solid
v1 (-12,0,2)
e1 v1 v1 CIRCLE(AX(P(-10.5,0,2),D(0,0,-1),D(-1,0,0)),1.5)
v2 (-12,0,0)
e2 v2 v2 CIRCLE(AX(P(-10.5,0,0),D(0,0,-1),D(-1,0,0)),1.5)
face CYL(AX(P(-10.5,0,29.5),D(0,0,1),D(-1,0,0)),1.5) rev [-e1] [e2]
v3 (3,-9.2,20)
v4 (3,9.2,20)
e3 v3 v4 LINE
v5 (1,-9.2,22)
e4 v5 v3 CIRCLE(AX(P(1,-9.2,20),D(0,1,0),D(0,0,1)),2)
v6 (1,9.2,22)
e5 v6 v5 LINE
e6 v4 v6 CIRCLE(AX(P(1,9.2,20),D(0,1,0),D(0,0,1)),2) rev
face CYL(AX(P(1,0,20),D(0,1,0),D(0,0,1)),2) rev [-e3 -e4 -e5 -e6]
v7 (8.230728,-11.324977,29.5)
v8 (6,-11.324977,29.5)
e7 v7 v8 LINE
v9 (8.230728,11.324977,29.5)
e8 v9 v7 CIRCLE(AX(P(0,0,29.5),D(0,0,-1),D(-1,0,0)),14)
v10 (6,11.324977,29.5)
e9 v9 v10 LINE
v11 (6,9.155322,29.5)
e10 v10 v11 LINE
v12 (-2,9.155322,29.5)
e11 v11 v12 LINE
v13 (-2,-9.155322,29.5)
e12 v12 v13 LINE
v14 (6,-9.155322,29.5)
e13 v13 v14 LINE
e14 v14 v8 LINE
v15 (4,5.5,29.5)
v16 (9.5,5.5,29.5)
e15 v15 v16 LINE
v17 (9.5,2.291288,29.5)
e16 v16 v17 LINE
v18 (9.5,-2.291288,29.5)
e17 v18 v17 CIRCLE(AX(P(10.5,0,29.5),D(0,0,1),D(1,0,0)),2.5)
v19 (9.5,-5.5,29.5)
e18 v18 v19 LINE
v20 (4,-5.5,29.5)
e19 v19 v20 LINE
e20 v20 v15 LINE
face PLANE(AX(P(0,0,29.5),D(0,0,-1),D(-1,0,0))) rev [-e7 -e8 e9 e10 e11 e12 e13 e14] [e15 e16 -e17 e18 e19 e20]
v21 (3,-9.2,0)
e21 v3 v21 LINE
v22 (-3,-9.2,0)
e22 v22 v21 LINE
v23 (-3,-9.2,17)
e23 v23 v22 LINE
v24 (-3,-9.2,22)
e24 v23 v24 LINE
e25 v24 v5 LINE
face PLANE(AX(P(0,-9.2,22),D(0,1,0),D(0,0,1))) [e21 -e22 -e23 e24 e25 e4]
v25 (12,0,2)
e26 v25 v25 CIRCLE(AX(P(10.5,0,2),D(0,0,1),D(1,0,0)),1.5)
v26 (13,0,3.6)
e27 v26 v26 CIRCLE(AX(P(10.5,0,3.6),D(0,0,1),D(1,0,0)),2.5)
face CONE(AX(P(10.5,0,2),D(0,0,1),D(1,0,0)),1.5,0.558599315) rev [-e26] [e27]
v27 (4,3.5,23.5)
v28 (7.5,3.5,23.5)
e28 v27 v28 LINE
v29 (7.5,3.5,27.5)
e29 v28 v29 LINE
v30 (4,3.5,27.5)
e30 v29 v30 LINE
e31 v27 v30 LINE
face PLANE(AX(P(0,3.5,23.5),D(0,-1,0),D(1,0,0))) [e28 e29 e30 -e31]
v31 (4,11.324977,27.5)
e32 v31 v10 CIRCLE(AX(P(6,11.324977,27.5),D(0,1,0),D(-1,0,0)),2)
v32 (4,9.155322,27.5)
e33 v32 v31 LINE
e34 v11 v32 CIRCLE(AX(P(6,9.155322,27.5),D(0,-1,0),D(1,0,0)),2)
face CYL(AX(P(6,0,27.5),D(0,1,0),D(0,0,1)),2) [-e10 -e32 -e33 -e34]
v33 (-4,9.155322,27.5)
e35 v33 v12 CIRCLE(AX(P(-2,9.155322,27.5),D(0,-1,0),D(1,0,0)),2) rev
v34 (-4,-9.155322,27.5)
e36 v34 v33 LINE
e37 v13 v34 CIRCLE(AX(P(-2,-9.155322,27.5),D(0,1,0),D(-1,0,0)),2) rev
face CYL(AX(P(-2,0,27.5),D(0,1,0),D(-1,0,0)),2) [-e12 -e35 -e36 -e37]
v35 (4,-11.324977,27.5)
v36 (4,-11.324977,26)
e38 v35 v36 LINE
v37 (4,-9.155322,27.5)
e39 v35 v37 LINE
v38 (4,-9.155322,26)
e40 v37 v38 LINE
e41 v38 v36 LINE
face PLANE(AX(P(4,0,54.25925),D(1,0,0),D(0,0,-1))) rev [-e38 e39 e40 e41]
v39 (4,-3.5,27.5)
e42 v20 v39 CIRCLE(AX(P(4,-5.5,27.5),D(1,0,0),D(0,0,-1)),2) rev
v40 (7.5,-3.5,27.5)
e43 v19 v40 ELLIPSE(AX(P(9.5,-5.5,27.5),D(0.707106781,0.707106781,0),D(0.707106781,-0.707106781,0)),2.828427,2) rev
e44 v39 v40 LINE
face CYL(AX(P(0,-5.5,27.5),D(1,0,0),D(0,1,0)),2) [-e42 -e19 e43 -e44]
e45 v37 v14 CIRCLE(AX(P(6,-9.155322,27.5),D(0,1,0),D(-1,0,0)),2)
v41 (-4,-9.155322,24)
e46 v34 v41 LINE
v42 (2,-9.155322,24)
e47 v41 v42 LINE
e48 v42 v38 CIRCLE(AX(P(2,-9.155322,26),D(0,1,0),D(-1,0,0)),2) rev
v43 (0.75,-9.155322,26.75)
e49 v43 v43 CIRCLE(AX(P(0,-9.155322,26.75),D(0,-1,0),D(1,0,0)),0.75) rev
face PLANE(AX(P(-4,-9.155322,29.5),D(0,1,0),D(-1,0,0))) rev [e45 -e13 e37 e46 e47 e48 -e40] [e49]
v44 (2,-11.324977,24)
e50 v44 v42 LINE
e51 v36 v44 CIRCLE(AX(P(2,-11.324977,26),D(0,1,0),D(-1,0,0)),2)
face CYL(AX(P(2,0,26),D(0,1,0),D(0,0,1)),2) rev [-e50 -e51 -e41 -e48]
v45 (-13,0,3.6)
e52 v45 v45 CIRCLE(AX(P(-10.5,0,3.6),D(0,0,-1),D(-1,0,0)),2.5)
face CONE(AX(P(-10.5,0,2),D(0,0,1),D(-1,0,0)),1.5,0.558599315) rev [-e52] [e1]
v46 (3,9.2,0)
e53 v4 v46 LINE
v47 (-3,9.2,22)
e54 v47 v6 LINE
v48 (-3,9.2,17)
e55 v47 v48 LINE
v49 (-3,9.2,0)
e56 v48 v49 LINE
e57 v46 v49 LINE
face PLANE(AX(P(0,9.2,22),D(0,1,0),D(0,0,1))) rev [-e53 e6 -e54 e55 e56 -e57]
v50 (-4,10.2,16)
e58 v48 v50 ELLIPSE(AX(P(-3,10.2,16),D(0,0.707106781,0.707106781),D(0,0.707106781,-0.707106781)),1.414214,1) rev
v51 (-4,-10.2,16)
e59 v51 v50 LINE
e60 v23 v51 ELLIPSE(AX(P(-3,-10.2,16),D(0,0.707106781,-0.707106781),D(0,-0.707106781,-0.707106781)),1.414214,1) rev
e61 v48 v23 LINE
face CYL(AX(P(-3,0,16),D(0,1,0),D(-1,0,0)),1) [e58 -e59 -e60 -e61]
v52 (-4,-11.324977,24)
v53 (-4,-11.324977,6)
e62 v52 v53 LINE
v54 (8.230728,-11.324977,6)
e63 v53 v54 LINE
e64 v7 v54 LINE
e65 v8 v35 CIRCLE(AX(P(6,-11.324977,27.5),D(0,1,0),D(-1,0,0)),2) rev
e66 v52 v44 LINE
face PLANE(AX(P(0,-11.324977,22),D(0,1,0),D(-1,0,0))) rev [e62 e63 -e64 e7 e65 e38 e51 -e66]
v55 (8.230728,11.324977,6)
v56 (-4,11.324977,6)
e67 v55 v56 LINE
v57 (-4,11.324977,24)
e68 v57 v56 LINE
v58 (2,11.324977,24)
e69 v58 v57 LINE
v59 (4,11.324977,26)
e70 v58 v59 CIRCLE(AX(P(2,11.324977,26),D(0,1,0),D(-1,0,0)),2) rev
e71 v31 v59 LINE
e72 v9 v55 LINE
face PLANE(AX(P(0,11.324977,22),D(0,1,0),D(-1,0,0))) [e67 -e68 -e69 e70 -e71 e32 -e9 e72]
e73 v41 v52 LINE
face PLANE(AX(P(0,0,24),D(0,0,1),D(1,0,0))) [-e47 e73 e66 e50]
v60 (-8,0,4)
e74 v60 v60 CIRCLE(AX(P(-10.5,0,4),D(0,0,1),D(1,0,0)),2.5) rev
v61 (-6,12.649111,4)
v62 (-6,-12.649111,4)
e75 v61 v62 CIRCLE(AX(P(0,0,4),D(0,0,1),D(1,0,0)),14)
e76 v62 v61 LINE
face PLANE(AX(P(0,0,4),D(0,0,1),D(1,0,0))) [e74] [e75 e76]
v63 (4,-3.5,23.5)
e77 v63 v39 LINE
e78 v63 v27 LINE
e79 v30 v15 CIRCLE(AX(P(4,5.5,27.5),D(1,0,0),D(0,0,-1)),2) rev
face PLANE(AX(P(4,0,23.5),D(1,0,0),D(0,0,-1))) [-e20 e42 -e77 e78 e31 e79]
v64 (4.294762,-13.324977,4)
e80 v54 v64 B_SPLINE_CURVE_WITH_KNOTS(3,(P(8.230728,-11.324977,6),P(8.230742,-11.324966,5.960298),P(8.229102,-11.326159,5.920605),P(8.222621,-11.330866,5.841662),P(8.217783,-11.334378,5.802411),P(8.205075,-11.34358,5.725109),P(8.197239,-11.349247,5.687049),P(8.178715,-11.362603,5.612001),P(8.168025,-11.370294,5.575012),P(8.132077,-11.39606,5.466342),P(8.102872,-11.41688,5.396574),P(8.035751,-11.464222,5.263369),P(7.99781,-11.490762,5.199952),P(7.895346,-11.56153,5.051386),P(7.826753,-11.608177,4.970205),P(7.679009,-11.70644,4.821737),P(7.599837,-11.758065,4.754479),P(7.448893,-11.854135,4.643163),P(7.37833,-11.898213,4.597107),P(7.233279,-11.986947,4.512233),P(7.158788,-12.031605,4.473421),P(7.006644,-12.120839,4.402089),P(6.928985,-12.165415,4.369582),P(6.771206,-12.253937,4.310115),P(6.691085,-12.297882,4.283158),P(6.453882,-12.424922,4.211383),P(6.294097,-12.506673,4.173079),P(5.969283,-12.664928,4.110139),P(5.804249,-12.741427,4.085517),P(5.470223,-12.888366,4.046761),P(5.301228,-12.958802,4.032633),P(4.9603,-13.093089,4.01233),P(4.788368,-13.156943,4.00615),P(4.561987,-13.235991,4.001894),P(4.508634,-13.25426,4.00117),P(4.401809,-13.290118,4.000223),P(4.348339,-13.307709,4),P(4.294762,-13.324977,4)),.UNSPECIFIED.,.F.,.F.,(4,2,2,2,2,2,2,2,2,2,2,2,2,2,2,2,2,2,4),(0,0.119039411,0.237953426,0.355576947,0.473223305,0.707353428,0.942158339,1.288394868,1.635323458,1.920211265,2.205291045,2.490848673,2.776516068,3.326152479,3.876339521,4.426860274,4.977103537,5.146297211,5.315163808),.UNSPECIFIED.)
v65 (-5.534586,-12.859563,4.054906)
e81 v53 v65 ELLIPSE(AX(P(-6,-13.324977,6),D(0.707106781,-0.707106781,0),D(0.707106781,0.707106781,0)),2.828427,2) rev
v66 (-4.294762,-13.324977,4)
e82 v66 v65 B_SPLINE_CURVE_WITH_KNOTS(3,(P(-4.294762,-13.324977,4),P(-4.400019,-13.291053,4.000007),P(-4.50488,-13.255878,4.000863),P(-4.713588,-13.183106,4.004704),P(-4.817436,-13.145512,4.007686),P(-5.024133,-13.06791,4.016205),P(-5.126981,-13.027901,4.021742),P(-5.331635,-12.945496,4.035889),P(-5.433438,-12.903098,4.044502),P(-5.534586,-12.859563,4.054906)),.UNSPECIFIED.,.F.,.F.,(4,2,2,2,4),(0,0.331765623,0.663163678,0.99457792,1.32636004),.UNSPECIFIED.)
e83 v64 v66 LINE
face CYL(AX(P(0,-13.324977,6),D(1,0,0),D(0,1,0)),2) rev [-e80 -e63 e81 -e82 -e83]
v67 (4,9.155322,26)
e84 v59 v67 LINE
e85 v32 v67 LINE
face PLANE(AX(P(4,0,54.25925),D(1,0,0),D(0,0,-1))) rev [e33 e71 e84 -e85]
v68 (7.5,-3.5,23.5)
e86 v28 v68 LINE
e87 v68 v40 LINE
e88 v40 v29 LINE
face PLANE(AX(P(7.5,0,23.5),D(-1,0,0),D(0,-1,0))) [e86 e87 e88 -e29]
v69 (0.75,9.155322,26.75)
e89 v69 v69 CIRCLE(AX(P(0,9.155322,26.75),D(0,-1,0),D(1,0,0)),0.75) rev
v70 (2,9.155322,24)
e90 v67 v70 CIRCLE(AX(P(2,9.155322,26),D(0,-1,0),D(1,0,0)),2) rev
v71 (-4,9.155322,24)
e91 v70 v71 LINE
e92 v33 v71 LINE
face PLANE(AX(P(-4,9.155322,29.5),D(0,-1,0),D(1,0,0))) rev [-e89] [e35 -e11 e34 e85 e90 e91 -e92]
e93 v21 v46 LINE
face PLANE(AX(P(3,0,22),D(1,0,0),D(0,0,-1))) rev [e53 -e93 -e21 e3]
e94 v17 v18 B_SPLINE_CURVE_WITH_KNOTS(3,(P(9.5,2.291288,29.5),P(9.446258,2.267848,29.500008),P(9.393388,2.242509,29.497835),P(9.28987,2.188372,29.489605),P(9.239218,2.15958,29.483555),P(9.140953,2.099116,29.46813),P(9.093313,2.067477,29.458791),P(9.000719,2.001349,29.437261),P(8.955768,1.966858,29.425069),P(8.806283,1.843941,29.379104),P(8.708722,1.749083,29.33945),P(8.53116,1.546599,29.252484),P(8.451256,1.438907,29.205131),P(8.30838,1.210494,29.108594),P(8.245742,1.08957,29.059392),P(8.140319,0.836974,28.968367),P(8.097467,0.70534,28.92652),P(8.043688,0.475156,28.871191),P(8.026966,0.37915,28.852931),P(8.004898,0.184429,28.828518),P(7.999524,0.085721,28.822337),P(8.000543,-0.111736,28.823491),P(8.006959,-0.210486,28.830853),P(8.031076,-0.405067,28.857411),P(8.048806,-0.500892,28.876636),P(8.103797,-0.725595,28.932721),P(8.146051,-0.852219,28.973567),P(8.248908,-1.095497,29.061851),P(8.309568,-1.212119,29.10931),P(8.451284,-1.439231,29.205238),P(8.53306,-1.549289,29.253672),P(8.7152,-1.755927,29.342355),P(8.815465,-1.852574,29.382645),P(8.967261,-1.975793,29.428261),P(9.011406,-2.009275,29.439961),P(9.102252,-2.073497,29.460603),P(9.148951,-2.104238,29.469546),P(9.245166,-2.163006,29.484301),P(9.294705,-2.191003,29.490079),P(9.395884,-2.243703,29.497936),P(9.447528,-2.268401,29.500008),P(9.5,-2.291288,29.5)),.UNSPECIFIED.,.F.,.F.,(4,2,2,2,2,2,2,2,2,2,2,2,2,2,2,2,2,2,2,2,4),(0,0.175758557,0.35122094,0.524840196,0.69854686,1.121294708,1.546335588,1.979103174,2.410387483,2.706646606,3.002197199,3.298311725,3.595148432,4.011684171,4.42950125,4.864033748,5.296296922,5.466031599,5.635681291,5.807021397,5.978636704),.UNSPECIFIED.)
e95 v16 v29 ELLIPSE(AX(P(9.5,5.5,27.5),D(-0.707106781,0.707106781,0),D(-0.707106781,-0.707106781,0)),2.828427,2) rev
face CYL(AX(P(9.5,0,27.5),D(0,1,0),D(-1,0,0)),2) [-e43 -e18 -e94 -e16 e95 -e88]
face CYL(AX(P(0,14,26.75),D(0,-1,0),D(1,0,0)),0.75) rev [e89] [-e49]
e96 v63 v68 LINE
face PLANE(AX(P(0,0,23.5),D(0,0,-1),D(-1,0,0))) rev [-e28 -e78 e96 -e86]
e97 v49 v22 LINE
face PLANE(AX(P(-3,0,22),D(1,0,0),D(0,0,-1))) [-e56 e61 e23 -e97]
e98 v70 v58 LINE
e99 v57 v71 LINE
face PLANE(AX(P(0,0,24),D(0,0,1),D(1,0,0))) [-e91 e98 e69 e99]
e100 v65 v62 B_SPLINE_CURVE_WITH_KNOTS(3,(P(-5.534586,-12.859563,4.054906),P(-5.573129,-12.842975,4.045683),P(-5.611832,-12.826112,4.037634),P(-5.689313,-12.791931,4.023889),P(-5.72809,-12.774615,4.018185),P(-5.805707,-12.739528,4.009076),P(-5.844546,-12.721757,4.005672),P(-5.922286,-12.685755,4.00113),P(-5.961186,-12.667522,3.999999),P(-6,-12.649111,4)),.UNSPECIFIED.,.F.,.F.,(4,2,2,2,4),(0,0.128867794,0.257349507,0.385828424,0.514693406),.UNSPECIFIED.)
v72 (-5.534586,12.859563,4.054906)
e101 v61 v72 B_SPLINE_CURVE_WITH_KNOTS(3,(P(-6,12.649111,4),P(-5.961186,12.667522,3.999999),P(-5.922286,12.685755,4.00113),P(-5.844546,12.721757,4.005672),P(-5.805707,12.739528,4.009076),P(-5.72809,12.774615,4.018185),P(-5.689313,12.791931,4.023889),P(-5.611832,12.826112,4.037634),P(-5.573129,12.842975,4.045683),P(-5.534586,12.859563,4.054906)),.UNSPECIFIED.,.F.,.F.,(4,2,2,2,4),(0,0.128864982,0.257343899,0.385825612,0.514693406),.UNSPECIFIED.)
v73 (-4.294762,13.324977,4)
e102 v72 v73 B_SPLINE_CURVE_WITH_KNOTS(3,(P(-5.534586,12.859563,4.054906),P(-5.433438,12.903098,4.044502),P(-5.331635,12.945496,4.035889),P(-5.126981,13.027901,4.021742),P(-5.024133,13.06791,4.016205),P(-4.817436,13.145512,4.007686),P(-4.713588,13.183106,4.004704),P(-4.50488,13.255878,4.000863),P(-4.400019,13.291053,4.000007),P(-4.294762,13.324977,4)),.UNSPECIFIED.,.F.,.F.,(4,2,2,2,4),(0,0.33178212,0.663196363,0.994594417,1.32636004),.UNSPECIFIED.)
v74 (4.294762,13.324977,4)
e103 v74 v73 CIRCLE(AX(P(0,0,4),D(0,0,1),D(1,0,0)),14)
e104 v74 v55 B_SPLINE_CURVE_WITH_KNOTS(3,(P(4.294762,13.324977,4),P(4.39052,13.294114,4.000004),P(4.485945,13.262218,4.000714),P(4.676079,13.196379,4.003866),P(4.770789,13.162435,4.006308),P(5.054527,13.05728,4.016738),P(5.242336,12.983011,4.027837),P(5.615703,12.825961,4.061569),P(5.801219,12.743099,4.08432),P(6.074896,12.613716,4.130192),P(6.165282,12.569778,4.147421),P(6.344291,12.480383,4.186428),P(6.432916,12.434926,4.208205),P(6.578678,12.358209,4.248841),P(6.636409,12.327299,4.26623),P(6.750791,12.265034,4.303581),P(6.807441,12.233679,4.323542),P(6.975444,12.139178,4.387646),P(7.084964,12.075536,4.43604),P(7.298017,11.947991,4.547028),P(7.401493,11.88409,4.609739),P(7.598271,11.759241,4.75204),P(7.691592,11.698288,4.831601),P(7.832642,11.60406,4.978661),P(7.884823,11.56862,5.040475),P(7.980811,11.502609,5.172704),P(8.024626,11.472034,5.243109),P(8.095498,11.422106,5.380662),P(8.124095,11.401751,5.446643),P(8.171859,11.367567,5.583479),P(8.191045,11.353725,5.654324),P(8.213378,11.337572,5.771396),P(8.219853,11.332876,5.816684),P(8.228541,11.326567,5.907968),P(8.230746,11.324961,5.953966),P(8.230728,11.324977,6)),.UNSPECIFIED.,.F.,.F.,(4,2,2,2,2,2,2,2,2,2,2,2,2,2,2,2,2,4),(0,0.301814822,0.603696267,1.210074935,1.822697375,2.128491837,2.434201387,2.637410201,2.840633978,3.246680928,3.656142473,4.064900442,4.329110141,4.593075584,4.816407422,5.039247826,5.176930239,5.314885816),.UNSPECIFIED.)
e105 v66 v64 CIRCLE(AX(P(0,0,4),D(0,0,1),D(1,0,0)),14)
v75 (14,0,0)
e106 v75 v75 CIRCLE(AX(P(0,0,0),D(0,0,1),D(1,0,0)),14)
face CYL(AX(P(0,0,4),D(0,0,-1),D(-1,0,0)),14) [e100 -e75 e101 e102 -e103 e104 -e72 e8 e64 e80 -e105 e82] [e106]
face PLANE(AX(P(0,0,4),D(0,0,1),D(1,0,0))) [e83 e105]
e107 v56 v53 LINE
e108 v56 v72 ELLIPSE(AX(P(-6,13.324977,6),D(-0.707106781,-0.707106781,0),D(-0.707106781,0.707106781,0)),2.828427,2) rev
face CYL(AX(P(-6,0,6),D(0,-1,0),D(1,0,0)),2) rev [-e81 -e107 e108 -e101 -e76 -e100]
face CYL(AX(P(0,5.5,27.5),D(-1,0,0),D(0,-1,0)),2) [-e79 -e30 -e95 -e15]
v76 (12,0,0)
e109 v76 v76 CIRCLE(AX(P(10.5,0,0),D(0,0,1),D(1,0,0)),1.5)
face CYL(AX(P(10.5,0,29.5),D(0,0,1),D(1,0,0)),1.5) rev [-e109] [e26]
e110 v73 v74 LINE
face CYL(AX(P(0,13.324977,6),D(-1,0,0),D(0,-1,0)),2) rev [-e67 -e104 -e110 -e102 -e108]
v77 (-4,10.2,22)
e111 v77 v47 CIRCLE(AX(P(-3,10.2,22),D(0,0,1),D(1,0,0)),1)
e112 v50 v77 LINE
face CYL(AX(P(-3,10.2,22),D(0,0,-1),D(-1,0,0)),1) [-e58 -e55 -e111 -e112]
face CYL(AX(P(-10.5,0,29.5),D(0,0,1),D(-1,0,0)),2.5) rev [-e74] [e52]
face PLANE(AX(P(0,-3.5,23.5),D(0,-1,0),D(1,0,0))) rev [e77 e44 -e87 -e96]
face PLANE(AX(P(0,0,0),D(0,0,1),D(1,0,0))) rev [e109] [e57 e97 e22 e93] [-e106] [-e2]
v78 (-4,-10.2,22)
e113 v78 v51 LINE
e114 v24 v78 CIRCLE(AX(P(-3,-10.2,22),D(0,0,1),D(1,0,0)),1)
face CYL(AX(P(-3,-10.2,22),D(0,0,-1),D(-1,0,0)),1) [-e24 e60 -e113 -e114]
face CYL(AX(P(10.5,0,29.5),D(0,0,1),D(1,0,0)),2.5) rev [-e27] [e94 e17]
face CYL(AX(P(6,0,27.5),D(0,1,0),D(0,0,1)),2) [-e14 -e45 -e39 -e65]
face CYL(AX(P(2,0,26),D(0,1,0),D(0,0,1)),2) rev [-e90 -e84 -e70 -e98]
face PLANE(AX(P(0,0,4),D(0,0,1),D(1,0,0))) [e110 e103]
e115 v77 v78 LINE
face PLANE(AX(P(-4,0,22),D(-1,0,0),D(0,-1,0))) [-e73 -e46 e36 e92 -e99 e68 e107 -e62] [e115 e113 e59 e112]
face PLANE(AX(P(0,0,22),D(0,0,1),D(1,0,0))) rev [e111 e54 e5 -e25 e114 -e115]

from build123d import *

# Parameters (mm, degrees)
SKETCH2_R           = 14
BOSS_EXTRUDE1_DEPTH = 4
SKETCH1_W           = 8
SKETCH1_H           = 22.649954628
SKETCH1_W_2         = 6
SKETCH1_H_2         = 18.4
BOSS_EXTRUDE2_DEPTH = 18
SKETCH3_W           = 8
SKETCH3_H           = 22.649954628
BOSS_EXTRUDE3_DEPTH = 2
SKETCH4_W           = 6
SKETCH4_H           = 18.4
CUT_EXTRUDE1_DEPTH  = 29.142494559
SKETCH5_W           = 5
SKETCH5_H           = 18.4
CUT_EXTRUDE2_DEPTH  = 33.57299495
SKETCH11_W          = 8
SKETCH11_H          = 18.310644234
BOSS_EXTRUDE5_DEPTH = 5.5
BOSS_EXTRUDE4_DEPTH = 25.5
CUT_EXTRUDE4_START  = 5.5
SKETCH9_W           = 3.5
SKETCH9_H           = 7
CUT_EXTRUDE4_DEPTH  = 6
SKETCH7_R           = 0.75
CUT_EXTRUDE5_DEPTH  = 41.03022536
FILLET3_R           = 1
FILLET4_R           = 2
FILLET5_R           = 2
SKETCH14_W          = 1.5
SKETCH14_H          = 2
FILLET6_R           = 2


# Some blends are built 0.0001 mm under size
with BuildPart() as part:
    # Sketch2 → Boss-Extrude1 (new body)
    with BuildSketch(Plane.XY):
        Circle(SKETCH2_R)
    extrude(amount=BOSS_EXTRUDE1_DEPTH)

    # Sketch1 → Boss-Extrude2 (add)
    with BuildSketch(Plane.XY.offset(4)):
        Rectangle(SKETCH1_W, SKETCH1_H)
        Rectangle(SKETCH1_W_2, SKETCH1_H_2, mode=Mode.SUBTRACT)
    extrude(amount=BOSS_EXTRUDE2_DEPTH)

    # Sketch3 → Boss-Extrude3 (add)
    with BuildSketch(Plane.XY.offset(22)):
        Rectangle(SKETCH3_W, SKETCH3_H)
    extrude(amount=BOSS_EXTRUDE3_DEPTH)

    # Sketch4 → Cut-Extrude1 (cut, through all)
    with BuildSketch(Plane.XY.offset(4)):
        Rectangle(SKETCH4_W, SKETCH4_H)
    extrude(amount=-CUT_EXTRUDE1_DEPTH, mode=Mode.SUBTRACT)

    # Sketch5 → Cut-Extrude2 (cut, through all)
    with BuildSketch(Plane.ZY.offset(-3)):
        with Locations((19.5, 0)):
            Rectangle(SKETCH5_W, SKETCH5_H)
    extrude(amount=CUT_EXTRUDE2_DEPTH, mode=Mode.SUBTRACT)

    # Sketch11 → Boss-Extrude5 (add)
    with BuildSketch(Plane.XY.offset(24)):
        Rectangle(SKETCH11_W, SKETCH11_H)
    extrude(amount=BOSS_EXTRUDE5_DEPTH)

    # Sketch8 → Boss-Extrude4 (add)
    with BuildSketch(Plane.XY.offset(4)):
        with BuildLine():
            Line((4, 11.324977314), (4, -11.324977314))
            Line((4, -11.324977314), (8.23072833, -11.324977314))
            ThreePointArc((8.23072833, -11.324977314), (12.474578081, -6.354911619), (14, 0))
            ThreePointArc((14, 0), (12.474578081, 6.354911619), (8.23072833, 11.324977314))
            Line((8.23072833, 11.324977314), (4, 11.324977314))
        make_face()
    extrude(amount=BOSS_EXTRUDE4_DEPTH)

    # Sketch9 → Cut-Extrude4 (cut)
    with BuildSketch(Plane.XY.offset(24).offset(CUT_EXTRUDE4_START)):
        with Locations((5.75, 0)):
            Rectangle(SKETCH9_W, SKETCH9_H)
    extrude(amount=-CUT_EXTRUDE4_DEPTH, mode=Mode.SUBTRACT)

    # Sketch7 → Cut-Extrude5 (cut, through all)
    with BuildSketch(Plane(origin=(0, -9.155322117, 0), x_dir=(1, 0, 0), z_dir=(0, 1, 0))):
        with Locations((0, -26.75)):
            Circle(SKETCH7_R)
    extrude(amount=CUT_EXTRUDE5_DEPTH, mode=Mode.SUBTRACT)

    # Fillet3
    fillet3_edges = [part.edges().sort_by_distance(p)[0] for p in [
        (-4, -9.2, 19.5),
        (-4, 0, 17),
        (-4, 9.2, 19.5),
    ]]
    fillet(fillet3_edges, radius=FILLET3_R - 0.0001)  # a hair under: the kernel refuses the full size

    # Fillet4
    # the kernel refuses this fillet: 2 mm, written as the material it adds along each edge
    with BuildSketch(Plane(origin=(13.23072833, -11.324977314, 4), x_dir=(0, -1, 0), z_dir=(-1, 0, 0))) as fillet4_piece_1_section:
        with BuildLine():
            CenterArc((FILLET4_R, FILLET4_R), FILLET4_R, 180, 90)
            Line((0, FILLET4_R), (0, 0))
            Line((0, 0), (FILLET4_R, 0))
        make_face()
    fillet4_piece_1 = extrude(amount=17.23072833, mode=Mode.PRIVATE)
    fillet4_piece_1 = fillet4_piece_1 & Plane(origin=(0, 0, 4.46853923), x_dir=(1, 0, 0), z_dir=(0, 0, -1)) * Cylinder(14, 43, mode=Mode.PRIVATE)
    add(fillet4_piece_1)
    with BuildSketch(Plane(origin=(-4, 11.324977314, 4), x_dir=(0, 0, 1), z_dir=(0, -1, 0))) as fillet4_piece_2:
        with BuildLine():
            CenterArc((FILLET4_R, FILLET4_R), FILLET4_R, 180, 90)
            Line((0, FILLET4_R), (0, 0))
            Line((0, 0), (FILLET4_R, 0))
        make_face()
    extrude(amount=22.649954628)
    with BuildSketch(Plane(origin=(-4, 11.324977314, 4), x_dir=(0, 1, 0), z_dir=(1, 0, 0))) as fillet4_piece_3_section:
        with BuildLine():
            CenterArc((FILLET4_R, FILLET4_R), FILLET4_R, 180, 90)
            Line((0, FILLET4_R), (0, 0))
            Line((0, 0), (FILLET4_R, 0))
        make_face()
    fillet4_piece_3 = extrude(amount=17.23072833, mode=Mode.PRIVATE)
    fillet4_piece_3 = fillet4_piece_3 & Plane(origin=(0, 0, 4.468539385), x_dir=(1, 0, 0), z_dir=(0, 0, -1)) * Cylinder(14, 43, mode=Mode.PRIVATE)
    add(fillet4_piece_3)
    with BuildSketch(Plane(origin=(-4, 11.324977314, 4), x_dir=(0, 0, 1), z_dir=(0, -1, 0))) as fillet4_piece_4a_section:
        with BuildLine():
            CenterArc((FILLET4_R, FILLET4_R), FILLET4_R, 180, 90)
            Line((0, FILLET4_R), (0, 0))
            Line((0, 0), (FILLET4_R, 0))
        make_face()
    fillet4_piece_4a = extrude(amount=27.649954628, mode=Mode.PRIVATE)
    fillet4_piece_4a = split(fillet4_piece_4a, bisect_by=Plane(origin=(-4.418611248, -11.324977314, 4.472457753), z_dir=(0, -1, 0)), keep=Keep.TOP, mode=Mode.PRIVATE)
    fillet4_piece_4a = fillet4_piece_4a & Plane(origin=(0, 0, 4.472457753), x_dir=(1, 0, 0), z_dir=(0, 0, -1)) * Cylinder(14, 64, mode=Mode.PRIVATE)
    with BuildSketch(Plane(origin=(13.23072833, -11.324977314, 4), x_dir=(0, -1, 0), z_dir=(-1, 0, 0))) as fillet4_piece_4b_section:
        with BuildLine():
            CenterArc((FILLET4_R, FILLET4_R), FILLET4_R, 180, 90)
            Line((0, FILLET4_R), (0, 0))
            Line((0, 0), (FILLET4_R, 0))
        make_face()
    fillet4_piece_4b = extrude(amount=22.23072833, mode=Mode.PRIVATE)
    fillet4_piece_4b = split(fillet4_piece_4b, bisect_by=Plane(origin=(-4, -11.687205264, 4.504335867), z_dir=(-1, 0, 0)), keep=Keep.TOP, mode=Mode.PRIVATE)
    fillet4_piece_4b = fillet4_piece_4b & Plane(origin=(0, 0, 4.504335867), x_dir=(1, 0, 0), z_dir=(0, 0, -1)) * Cylinder(14, 53, mode=Mode.PRIVATE)
    fillet4_piece_4 = fillet4_piece_4a & fillet4_piece_4b
    add(fillet4_piece_4)
    with BuildSketch(Plane(origin=(-4, 16.324977314, 4), x_dir=(0, 0, 1), z_dir=(0, -1, 0))) as fillet4_piece_5a_section:
        with BuildLine():
            CenterArc((FILLET4_R, FILLET4_R), FILLET4_R, 180, 90)
            Line((0, FILLET4_R), (0, 0))
            Line((0, 0), (FILLET4_R, 0))
        make_face()
    fillet4_piece_5a = extrude(amount=27.649954628, mode=Mode.PRIVATE)
    fillet4_piece_5a = split(fillet4_piece_5a, bisect_by=Plane(origin=(-4.418615633, 11.324977314, 4.472459709), z_dir=(0, 1, 0)), keep=Keep.TOP, mode=Mode.PRIVATE)
    fillet4_piece_5a = fillet4_piece_5a & Plane(origin=(0, 0, 4.472459709), x_dir=(1, 0, 0), z_dir=(0, 0, -1)) * Cylinder(14, 64, mode=Mode.PRIVATE)
    with BuildSketch(Plane(origin=(-9, 11.324977314, 4), x_dir=(0, 1, 0), z_dir=(1, 0, 0))) as fillet4_piece_5b_section:
        with BuildLine():
            CenterArc((FILLET4_R, FILLET4_R), FILLET4_R, 180, 90)
            Line((0, FILLET4_R), (0, 0))
            Line((0, 0), (FILLET4_R, 0))
        make_face()
    fillet4_piece_5b = extrude(amount=22.23072833, mode=Mode.PRIVATE)
    fillet4_piece_5b = split(fillet4_piece_5b, bisect_by=Plane(origin=(-4, 11.687206224, 4.504336165), z_dir=(-1, 0, 0)), keep=Keep.TOP, mode=Mode.PRIVATE)
    fillet4_piece_5b = fillet4_piece_5b & Plane(origin=(0, 0, 4.504336165), x_dir=(1, 0, 0), z_dir=(0, 0, -1)) * Cylinder(14, 53, mode=Mode.PRIVATE)
    fillet4_piece_5 = fillet4_piece_5a & fillet4_piece_5b
    add(fillet4_piece_5)

    # Fillet5
    fillet5_edges = [part.edges().sort_by_distance(p)[0] for p in [
        (3, 0, 22),
    ]]
    fillet(fillet5_edges, radius=FILLET5_R)

    # Sketch14 → Cut-Revolve1 (revolve, cut)
    with BuildSketch(Plane(origin=(0, 0, 0), x_dir=(1, 0, 0), z_dir=(0, 1, 0))):
        Polygon((10.5, -2), (10.5, -29.5), (13, -29.5), (13, -3.6), (12, -2), align=None)
        with Locations((11.25, -1)):
            Rectangle(SKETCH14_W, SKETCH14_H)
    cut_revolve1 = revolve(axis=Axis((10.5, 0, 29.5), (0, 0, -1)), mode=Mode.SUBTRACT)

    # Mirror1: Cut-Revolve1 across plane
    add(cut_revolve1.mirror(Plane(origin=(0, 0, 0), x_dir=(0, 0, 1), z_dir=(1, 0, 0))), mode=Mode.SUBTRACT)

    # Fillet6
    # the kernel refuses this fillet: 2 mm, written as the material it adds along each edge
    with BuildSketch(Plane(origin=(4, -11.324977314, 24), x_dir=(-1, 0, 0), z_dir=(0, 1, 0)), Plane(origin=(4, 4.155322117, 24), x_dir=(-1, 0, 0), z_dir=(0, 1, 0))) as fillet6_piece_1:
        with BuildLine():
            CenterArc((FILLET6_R, FILLET6_R), FILLET6_R, 180, 90)
            Line((0, FILLET6_R), (0, 0))
            Line((0, 0), (FILLET6_R, 0))
        make_face()
    extrude(amount=7.169655197)
    # the kernel refuses this fillet: 2 mm, written as the material it takes off along each edge
    with BuildSketch(Plane(origin=(4, 16.324977314, 29.5), x_dir=(1, 0, 0), z_dir=(0, -1, 0)), Plane(origin=(4, -9.155322117, 29.5), x_dir=(1, 0, 0), z_dir=(0, -1, 0))) as fillet6_2_piece_1:
        with BuildLine():
            CenterArc((FILLET6_R, -FILLET6_R), FILLET6_R, 90, 90)
            Line((0, -FILLET6_R), (0, 0))
            Line((0, 0), (FILLET6_R, 0))
        make_face()
    extrude(amount=7.169655197, mode=Mode.SUBTRACT)
    with BuildSketch(Plane(origin=(7.5, 3.5, 29.5), x_dir=(0, 1, 0), z_dir=(-1, 0, 0)), Plane(origin=(4, -3.5, 29.5), x_dir=(0, -1, 0), z_dir=(1, 0, 0))) as fillet6_2_piece_2:
        with BuildLine():
            CenterArc((FILLET6_R, FILLET6_R), FILLET6_R, 180, 90)
            Line((0, FILLET6_R), (0, 0))
            Line((0, 0), (FILLET6_R, 0))
        make_face()
    extrude(amount=3.5, mode=Mode.SUBTRACT)
    with BuildSketch(Plane(origin=(7.5, -3.5, 29.5), x_dir=(1, 0, 0), z_dir=(0, 1, 0))) as fillet6_2_piece_3:
        with BuildLine():
            CenterArc((FILLET6_R, FILLET6_R), FILLET6_R, 180, 90)
            Line((0, FILLET6_R), (0, 0))
            Line((0, 0), (FILLET6_R, 0))
        make_face()
    extrude(amount=7, mode=Mode.SUBTRACT)
    with BuildSketch(Plane(origin=(-4, 14.155322117, 29.5), x_dir=(0, 0, -1), z_dir=(0, -1, 0))) as fillet6_2_piece_4:
        with BuildLine():
            CenterArc((FILLET6_R, FILLET6_R), FILLET6_R, 180, 90)
            Line((0, FILLET6_R), (0, 0))
            Line((0, 0), (FILLET6_R, 0))
        make_face()
    extrude(amount=28.310644234, mode=Mode.SUBTRACT)
    with BuildSketch(Plane(origin=(12.5, 3.5, 29.5), x_dir=(0, 1, 0), z_dir=(-1, 0, 0))) as fillet6_2_piece_5a_section:
        with BuildLine():
            CenterArc((FILLET6_R, FILLET6_R), FILLET6_R, 180, 90)
            Line((0, FILLET6_R), (0, 0))
            Line((0, 0), (FILLET6_R, 0))
        make_face()
    fillet6_2_piece_5a = extrude(amount=8.5, mode=Mode.PRIVATE)
    fillet6_2_piece_5a = split(fillet6_2_piece_5a, bisect_by=Plane(origin=(7.5, 3.952790229, 29.047209771), z_dir=(1, 0, 0)), keep=Keep.TOP, mode=Mode.PRIVATE)
    with BuildSketch(Plane(origin=(7.5, -3.5, 29.5), x_dir=(1, 0, 0), z_dir=(0, 1, 0))) as fillet6_2_piece_5b_section:
        with BuildLine():
            CenterArc((FILLET6_R, FILLET6_R), FILLET6_R, 180, 90)
            Line((0, FILLET6_R), (0, 0))
            Line((0, 0), (FILLET6_R, 0))
        make_face()
    fillet6_2_piece_5b = extrude(amount=12, mode=Mode.PRIVATE)
    fillet6_2_piece_5b = split(fillet6_2_piece_5b, bisect_by=Plane(origin=(7.952790229, 3.5, 29.047209771), z_dir=(0, 1, 0)), keep=Keep.TOP, mode=Mode.PRIVATE)
    fillet6_2_piece_5 = fillet6_2_piece_5a & fillet6_2_piece_5b
    add(fillet6_2_piece_5, mode=Mode.SUBTRACT)
    with BuildSketch(Plane(origin=(4, -3.5, 29.5), x_dir=(0, -1, 0), z_dir=(1, 0, 0))) as fillet6_2_piece_6a_section:
        with BuildLine():
            CenterArc((FILLET6_R, FILLET6_R), FILLET6_R, 180, 90)
            Line((0, FILLET6_R), (0, 0))
            Line((0, 0), (FILLET6_R, 0))
        make_face()
    fillet6_2_piece_6a = extrude(amount=8.5, mode=Mode.PRIVATE)
    fillet6_2_piece_6a = split(fillet6_2_piece_6a, bisect_by=Plane(origin=(7.5, -3.952790229, 29.047209771), z_dir=(1, 0, 0)), keep=Keep.TOP, mode=Mode.PRIVATE)
    with BuildSketch(Plane(origin=(7.5, -8.5, 29.5), x_dir=(1, 0, 0), z_dir=(0, 1, 0))) as fillet6_2_piece_6b_section:
        with BuildLine():
            CenterArc((FILLET6_R, FILLET6_R), FILLET6_R, 180, 90)
            Line((0, FILLET6_R), (0, 0))
            Line((0, 0), (FILLET6_R, 0))
        make_face()
    fillet6_2_piece_6b = extrude(amount=12, mode=Mode.PRIVATE)
    fillet6_2_piece_6b = split(fillet6_2_piece_6b, bisect_by=Plane(origin=(7.952790229, -3.5, 29.047209771), z_dir=(0, -1, 0)), keep=Keep.TOP, mode=Mode.PRIVATE)
    fillet6_2_piece_6 = fillet6_2_piece_6a & fillet6_2_piece_6b
    add(fillet6_2_piece_6, mode=Mode.SUBTRACT)


solid = part.part
